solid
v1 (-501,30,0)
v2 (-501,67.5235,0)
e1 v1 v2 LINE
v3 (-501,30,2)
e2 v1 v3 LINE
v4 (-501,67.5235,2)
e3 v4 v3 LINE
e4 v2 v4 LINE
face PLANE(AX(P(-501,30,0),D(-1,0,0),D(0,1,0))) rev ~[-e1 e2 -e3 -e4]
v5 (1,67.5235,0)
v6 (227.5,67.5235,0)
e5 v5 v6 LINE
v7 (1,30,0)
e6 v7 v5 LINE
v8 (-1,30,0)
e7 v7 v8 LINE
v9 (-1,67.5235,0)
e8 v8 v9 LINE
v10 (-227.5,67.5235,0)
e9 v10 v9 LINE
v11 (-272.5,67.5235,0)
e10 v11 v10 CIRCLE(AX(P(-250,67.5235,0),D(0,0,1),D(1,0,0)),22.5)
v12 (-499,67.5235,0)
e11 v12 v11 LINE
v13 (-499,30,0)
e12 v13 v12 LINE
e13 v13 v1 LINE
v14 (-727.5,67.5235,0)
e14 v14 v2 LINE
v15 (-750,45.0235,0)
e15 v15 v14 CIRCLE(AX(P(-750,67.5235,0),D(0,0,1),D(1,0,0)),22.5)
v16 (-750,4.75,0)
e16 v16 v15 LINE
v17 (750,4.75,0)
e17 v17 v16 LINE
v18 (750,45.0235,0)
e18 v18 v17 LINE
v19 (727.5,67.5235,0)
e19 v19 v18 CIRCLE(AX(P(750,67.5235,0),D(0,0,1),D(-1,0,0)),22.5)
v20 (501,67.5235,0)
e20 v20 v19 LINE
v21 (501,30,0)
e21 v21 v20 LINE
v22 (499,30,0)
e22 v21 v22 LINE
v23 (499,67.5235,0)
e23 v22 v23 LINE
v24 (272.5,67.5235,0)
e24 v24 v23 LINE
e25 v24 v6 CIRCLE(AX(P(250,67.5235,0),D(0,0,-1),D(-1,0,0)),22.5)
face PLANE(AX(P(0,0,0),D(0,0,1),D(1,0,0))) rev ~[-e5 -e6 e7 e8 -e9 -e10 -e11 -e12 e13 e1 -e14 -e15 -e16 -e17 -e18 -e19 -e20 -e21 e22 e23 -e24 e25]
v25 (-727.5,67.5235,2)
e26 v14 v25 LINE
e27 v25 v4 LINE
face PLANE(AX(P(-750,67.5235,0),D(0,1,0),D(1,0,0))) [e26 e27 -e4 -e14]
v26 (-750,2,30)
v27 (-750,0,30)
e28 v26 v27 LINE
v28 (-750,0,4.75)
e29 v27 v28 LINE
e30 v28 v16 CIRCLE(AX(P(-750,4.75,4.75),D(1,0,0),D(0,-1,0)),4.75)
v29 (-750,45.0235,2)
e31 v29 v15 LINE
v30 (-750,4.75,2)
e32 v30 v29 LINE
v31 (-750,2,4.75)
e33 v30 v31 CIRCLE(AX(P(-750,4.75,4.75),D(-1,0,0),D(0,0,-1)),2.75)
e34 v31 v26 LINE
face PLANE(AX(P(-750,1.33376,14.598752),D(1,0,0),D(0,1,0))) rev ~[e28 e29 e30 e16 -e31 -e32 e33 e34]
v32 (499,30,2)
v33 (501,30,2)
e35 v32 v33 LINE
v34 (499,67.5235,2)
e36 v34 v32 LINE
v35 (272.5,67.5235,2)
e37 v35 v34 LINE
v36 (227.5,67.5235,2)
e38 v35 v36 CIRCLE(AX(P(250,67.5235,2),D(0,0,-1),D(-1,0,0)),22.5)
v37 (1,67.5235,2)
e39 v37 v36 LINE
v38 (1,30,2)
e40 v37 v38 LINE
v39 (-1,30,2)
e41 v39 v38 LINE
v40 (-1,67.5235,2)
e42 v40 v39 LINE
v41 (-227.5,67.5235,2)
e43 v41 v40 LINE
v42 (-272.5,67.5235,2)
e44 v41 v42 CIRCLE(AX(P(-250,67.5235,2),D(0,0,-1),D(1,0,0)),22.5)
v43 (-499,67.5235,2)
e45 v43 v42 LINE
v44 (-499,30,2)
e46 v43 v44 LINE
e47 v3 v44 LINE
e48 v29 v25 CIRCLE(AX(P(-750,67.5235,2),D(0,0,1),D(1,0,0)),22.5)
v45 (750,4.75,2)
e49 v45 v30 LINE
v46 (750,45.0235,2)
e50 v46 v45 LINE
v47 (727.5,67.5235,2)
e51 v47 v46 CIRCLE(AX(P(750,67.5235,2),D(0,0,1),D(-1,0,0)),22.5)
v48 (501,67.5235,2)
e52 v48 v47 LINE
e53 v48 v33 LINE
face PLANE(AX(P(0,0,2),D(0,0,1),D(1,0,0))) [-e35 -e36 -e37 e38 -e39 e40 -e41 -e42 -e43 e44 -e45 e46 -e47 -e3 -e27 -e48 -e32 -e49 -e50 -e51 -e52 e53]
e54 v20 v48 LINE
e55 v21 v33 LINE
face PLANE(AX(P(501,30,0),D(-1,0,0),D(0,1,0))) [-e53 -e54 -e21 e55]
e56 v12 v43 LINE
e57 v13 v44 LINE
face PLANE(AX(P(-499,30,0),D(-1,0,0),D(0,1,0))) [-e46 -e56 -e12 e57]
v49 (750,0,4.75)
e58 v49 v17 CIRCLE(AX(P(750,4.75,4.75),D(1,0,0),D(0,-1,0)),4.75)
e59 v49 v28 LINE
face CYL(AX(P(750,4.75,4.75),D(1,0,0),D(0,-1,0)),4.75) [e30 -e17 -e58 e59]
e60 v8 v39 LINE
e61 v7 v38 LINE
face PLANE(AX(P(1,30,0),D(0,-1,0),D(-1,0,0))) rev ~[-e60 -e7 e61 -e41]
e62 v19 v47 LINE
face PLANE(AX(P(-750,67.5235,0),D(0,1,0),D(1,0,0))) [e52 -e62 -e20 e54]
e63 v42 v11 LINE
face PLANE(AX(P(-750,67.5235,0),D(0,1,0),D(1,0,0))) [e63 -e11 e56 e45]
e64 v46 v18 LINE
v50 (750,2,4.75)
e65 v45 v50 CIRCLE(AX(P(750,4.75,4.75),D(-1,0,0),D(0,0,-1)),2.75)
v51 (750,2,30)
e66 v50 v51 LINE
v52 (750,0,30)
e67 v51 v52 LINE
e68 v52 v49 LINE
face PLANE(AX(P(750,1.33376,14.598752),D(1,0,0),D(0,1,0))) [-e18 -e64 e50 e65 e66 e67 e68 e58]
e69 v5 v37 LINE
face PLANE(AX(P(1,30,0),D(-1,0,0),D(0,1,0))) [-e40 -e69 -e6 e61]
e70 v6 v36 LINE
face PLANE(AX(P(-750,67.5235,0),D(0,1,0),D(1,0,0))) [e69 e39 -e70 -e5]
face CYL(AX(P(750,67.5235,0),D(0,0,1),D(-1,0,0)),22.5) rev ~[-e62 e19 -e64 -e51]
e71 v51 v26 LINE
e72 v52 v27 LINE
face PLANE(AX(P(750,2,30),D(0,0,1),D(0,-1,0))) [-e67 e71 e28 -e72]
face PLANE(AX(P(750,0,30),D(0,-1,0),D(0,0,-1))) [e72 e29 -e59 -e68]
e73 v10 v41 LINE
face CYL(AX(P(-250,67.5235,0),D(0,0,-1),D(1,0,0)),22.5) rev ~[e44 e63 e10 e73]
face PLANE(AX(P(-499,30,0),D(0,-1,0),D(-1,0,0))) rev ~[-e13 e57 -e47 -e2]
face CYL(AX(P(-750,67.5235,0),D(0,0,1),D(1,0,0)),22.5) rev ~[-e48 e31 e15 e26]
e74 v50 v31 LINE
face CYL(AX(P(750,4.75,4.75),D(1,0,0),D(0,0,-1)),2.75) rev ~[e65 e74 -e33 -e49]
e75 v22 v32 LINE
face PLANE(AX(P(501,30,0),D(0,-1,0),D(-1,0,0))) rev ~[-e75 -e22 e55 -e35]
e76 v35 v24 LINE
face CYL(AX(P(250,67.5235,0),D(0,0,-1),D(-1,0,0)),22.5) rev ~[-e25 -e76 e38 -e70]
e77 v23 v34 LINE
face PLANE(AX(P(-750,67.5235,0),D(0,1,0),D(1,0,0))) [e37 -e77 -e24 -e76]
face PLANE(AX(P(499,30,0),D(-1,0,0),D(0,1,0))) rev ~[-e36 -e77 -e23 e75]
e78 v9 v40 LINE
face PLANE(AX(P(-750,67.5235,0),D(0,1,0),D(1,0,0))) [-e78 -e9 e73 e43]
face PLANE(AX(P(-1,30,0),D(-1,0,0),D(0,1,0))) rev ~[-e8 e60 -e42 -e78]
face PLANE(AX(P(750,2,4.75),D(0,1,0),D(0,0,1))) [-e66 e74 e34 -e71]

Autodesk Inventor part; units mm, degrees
ref_plane "YZ Plane" through (0, 0, 0) normal (1, 0, 0) x (0, 1, 0)
ref_plane "XZ Plane" through (0, 0, 0) normal (0, 1, 0) x (-1, 0, 0)
ref_plane "XY Plane" through (0, 0, 0) normal (0, 0, 1) x (1, 0, 0)
sketch "Sketch1" plane through (0, 0, 0) normal (0, 0, 1) x (1, 0, 0)
  line L0 (-750, 67.5235) -> (750, 67.5235)
  line L1 (750, 67.5235) -> (750, 0)
  line L2 (750, 0) -> (-750, 0)
  line L3 (-750, 0) -> (-750, 67.5235)
  point P0 (0, 0)
  point P1 (0, 0)
  dimension "d0" = 1500
  dimension "d1" = 67.5235
extrude "Plate1" add sketch "Sketch1" along normal blind 2
sketch "Sketch2" plane through (750, 2, 0) normal (0, -1, 0) x (1, 0, 0)
  line L0 (-1500, 0) -> (0, 0)
  line L1 (0, 0) -> (0, 30)
  line L2 (0, 30) -> (-1500, 30)
  line L3 (-1500, 30) -> (-1500, 0)
edge flange "Flange1" height 30 angle 90 thickness 2 bend radius 2.75 thickness toward (0, -1, 0) relief round relief width 2 relief depth 1 edges at (0, 0, 2) wall of the first edge with corners at (-750, 2, 0) (750, 2, 0) (750, 2, 30) (-750, 2, 30)
bend "Bend1"
corner "Corner1"
sketch "Sketch5" plane through (0, 0, 0) normal (0, 0, -1) x (-1, 0, 0)
  line L0 (750, 67.5235) -> (-750, 67.5235) projected
  line L1 (-1, 30) -> (-1, 67.5235)
  line L2 (750, 0) -> (-750, 0) projected
  line L3 (-1, 30) -> (1, 30)
  line L4 (1, 30) -> (1, 67.5235)
  point P0 (0, 0)
  point P1 (0, 30)
  point P2 (0, 0)
  dimension "d27" = 2
  dimension "d28" = 30
extrude "Extrusion1" cut sketch "Sketch5" against normal through all
pattern_linear "Rectangular Pattern1" count 3 spacing 500 along (1, 0, 0) of "Extrusion1" first direction both ways yes
sketch "Sketch6" plane through (0, 0, 0) normal (0, 0, -1) x (-1, 0, 0)
  line L0 (-750, 67.5235) -> (-750, 4.75) projected
  circle A0 centre (-750, 67.5235) radius 22.5
  line L1 (-750, 67.5235) -> (750, 67.5235) projected
  line L2 (-1, 30) -> (-1, 67.5235) projected
  line L3 (-499, 67.5235) -> (-499, 30) projected
  line L4 (-1, 30) -> (-499, 30) construction
  circle A1 centre (-250, 67.5235) radius 22.5
  point P0 (0, 0)
  point P1 (-727.5, 67.5235)
  point P2 (-750, 45.0235)
  point P3 (-250, 30)
  dimension "d24" = 45
extrude "Extrusion2" cut sketch "Sketch6" along normal mid plane 30 contours L1 A0 L0 | A1 L1 | L1 A1 picked at (-748.3311, 52.7115)
mirror "Mirror1" about plane through (0, 0, 0) normal (1, 0, 0) of "Extrusion2"
sketch "Sketch7" plane through (0, 0, 2) normal (0, 0, 1) x (1, 0, 0)
  arc A0 (-750, 45.0235) -> (-727.5, 67.5235) centre (-750, 67.5235) ccw projected
  line L0 (-750, 4.75) -> (-750, 45.0235) projected
  line L1 (-750, 4.75) -> (750, 4.75) projected
  line L2 (750, 45.0235) -> (750, 4.75) projected
  arc A1 (727.5, 67.5235) -> (750, 45.0235) centre (750, 67.5235) ccw projected
  line L3 (501, 67.5235) -> (727.5, 67.5235) projected
  line L4 (501, 67.5235) -> (501, 30) projected
  line L5 (501, 30) -> (499, 30) projected
  line L6 (499, 30) -> (499, 67.5235) projected
  line L7 (1, 67.5235) -> (227.5, 67.5235) projected
  line L8 (1, 67.5235) -> (1, 30) projected
  line L9 (1, 30) -> (-1, 30) projected
  line L10 (-1, 30) -> (-1, 67.5235) projected
  line L11 (-499, 67.5235) -> (-272.5, 67.5235) projected
  line L12 (-499, 67.5235) -> (-499, 30) projected
  line L13 (-499, 30) -> (-501, 30) projected
  line L14 (-501, 30) -> (-501, 67.5235) projected
  line L15 (-727.5, 67.5235) -> (-501, 67.5235) projected
  line L16 (650, 4.75) -> (650, 67.5235) construction
  line L17 (-750, 4.75) -> (750, 4.75) projected
  circle A2 centre (650, 36.1368) radius 5
  line L18 (272.5, 67.5235) -> (499, 67.5235) projected
  arc A3 (227.5, 67.5235) -> (272.5, 67.5235) centre (250, 67.5235) ccw projected
  line L19 (-227.5, 67.5235) -> (-1, 67.5235) projected
  arc A4 (-272.5, 67.5235) -> (-227.5, 67.5235) centre (-250, 67.5235) ccw projected
  point P0 (0, 0)
  dimension "d29" = 100
  dimension "d30" = 10
extrude "Extrusion3" [suppressed]
mirror "Mirror2" [suppressed]
sketch "Sketch8" plane through (0, 0, 2) normal (0, 0, 1) x (1, 0, 0)
  line L0 (494, 62.5235) -> (494, 50.5235) construction
  line L1 (494, 50.5235) -> (294, 50.5235) construction
  line L2 (294, 50.5235) -> (294, 62.5235) construction
  line L3 (294, 62.5235) -> (494, 62.5235) construction
  line L4 (501, 67.5235) -> (727.5, 67.5235) projected
  line L5 (272.5, 67.5235) -> (499, 67.5235) projected
  point P0 (0, 0)
  dimension "d33" = 200
  dimension "d34" = 12
  dimension "d37" = 5
  dimension "d38" = 5
mark "Mark2"
equation "\"d28\" = Стрингер_глубина_паза"
equation "\"d1\" = Стрингер_3"
equation "\"d27\" = d18"
equation "\"d2\" = Thickness"
equation "\"d3\" = BendReliefWidth"
equation "\"d4\" = BendReliefDepth"
equation "\"d5\" = MinimumRemnant"
equation "\"d6\" = TransitionRadius"
equation "\"d9\" = BendRadius"
equation "\"d10\" = CornerReliefSize"
equation "\"d11\" = GapSize"
equation "\"d12\" = JacobiRadiusSize"
equation "\"BendReliefWidth\" = Thickness"
equation "\"BendReliefDepth\" = 0.5 * Thickness"
equation "\"CornerReliefSize\" = 4 * Thickness"
equation "\"MinimumRemnant\" = 2 * Thickness"
equation "\"TransitionRadius\" = BendRadius"
equation "\"JacobiRadiusSize\" = BendRadius"
equation "\"GapSize\" = Thickness"
equation "\"d18\" = Thickness"
equation "\"Стрингер_3\" = 67.5235"
equation "\"Thickness\" = 2"
equation "\"BendRadius\" = 2.75"
equation "\"Стрингер_глубина_паза\" = 30"
properties part number "MSC 053 stringer board #" material "Stainless Steel"
